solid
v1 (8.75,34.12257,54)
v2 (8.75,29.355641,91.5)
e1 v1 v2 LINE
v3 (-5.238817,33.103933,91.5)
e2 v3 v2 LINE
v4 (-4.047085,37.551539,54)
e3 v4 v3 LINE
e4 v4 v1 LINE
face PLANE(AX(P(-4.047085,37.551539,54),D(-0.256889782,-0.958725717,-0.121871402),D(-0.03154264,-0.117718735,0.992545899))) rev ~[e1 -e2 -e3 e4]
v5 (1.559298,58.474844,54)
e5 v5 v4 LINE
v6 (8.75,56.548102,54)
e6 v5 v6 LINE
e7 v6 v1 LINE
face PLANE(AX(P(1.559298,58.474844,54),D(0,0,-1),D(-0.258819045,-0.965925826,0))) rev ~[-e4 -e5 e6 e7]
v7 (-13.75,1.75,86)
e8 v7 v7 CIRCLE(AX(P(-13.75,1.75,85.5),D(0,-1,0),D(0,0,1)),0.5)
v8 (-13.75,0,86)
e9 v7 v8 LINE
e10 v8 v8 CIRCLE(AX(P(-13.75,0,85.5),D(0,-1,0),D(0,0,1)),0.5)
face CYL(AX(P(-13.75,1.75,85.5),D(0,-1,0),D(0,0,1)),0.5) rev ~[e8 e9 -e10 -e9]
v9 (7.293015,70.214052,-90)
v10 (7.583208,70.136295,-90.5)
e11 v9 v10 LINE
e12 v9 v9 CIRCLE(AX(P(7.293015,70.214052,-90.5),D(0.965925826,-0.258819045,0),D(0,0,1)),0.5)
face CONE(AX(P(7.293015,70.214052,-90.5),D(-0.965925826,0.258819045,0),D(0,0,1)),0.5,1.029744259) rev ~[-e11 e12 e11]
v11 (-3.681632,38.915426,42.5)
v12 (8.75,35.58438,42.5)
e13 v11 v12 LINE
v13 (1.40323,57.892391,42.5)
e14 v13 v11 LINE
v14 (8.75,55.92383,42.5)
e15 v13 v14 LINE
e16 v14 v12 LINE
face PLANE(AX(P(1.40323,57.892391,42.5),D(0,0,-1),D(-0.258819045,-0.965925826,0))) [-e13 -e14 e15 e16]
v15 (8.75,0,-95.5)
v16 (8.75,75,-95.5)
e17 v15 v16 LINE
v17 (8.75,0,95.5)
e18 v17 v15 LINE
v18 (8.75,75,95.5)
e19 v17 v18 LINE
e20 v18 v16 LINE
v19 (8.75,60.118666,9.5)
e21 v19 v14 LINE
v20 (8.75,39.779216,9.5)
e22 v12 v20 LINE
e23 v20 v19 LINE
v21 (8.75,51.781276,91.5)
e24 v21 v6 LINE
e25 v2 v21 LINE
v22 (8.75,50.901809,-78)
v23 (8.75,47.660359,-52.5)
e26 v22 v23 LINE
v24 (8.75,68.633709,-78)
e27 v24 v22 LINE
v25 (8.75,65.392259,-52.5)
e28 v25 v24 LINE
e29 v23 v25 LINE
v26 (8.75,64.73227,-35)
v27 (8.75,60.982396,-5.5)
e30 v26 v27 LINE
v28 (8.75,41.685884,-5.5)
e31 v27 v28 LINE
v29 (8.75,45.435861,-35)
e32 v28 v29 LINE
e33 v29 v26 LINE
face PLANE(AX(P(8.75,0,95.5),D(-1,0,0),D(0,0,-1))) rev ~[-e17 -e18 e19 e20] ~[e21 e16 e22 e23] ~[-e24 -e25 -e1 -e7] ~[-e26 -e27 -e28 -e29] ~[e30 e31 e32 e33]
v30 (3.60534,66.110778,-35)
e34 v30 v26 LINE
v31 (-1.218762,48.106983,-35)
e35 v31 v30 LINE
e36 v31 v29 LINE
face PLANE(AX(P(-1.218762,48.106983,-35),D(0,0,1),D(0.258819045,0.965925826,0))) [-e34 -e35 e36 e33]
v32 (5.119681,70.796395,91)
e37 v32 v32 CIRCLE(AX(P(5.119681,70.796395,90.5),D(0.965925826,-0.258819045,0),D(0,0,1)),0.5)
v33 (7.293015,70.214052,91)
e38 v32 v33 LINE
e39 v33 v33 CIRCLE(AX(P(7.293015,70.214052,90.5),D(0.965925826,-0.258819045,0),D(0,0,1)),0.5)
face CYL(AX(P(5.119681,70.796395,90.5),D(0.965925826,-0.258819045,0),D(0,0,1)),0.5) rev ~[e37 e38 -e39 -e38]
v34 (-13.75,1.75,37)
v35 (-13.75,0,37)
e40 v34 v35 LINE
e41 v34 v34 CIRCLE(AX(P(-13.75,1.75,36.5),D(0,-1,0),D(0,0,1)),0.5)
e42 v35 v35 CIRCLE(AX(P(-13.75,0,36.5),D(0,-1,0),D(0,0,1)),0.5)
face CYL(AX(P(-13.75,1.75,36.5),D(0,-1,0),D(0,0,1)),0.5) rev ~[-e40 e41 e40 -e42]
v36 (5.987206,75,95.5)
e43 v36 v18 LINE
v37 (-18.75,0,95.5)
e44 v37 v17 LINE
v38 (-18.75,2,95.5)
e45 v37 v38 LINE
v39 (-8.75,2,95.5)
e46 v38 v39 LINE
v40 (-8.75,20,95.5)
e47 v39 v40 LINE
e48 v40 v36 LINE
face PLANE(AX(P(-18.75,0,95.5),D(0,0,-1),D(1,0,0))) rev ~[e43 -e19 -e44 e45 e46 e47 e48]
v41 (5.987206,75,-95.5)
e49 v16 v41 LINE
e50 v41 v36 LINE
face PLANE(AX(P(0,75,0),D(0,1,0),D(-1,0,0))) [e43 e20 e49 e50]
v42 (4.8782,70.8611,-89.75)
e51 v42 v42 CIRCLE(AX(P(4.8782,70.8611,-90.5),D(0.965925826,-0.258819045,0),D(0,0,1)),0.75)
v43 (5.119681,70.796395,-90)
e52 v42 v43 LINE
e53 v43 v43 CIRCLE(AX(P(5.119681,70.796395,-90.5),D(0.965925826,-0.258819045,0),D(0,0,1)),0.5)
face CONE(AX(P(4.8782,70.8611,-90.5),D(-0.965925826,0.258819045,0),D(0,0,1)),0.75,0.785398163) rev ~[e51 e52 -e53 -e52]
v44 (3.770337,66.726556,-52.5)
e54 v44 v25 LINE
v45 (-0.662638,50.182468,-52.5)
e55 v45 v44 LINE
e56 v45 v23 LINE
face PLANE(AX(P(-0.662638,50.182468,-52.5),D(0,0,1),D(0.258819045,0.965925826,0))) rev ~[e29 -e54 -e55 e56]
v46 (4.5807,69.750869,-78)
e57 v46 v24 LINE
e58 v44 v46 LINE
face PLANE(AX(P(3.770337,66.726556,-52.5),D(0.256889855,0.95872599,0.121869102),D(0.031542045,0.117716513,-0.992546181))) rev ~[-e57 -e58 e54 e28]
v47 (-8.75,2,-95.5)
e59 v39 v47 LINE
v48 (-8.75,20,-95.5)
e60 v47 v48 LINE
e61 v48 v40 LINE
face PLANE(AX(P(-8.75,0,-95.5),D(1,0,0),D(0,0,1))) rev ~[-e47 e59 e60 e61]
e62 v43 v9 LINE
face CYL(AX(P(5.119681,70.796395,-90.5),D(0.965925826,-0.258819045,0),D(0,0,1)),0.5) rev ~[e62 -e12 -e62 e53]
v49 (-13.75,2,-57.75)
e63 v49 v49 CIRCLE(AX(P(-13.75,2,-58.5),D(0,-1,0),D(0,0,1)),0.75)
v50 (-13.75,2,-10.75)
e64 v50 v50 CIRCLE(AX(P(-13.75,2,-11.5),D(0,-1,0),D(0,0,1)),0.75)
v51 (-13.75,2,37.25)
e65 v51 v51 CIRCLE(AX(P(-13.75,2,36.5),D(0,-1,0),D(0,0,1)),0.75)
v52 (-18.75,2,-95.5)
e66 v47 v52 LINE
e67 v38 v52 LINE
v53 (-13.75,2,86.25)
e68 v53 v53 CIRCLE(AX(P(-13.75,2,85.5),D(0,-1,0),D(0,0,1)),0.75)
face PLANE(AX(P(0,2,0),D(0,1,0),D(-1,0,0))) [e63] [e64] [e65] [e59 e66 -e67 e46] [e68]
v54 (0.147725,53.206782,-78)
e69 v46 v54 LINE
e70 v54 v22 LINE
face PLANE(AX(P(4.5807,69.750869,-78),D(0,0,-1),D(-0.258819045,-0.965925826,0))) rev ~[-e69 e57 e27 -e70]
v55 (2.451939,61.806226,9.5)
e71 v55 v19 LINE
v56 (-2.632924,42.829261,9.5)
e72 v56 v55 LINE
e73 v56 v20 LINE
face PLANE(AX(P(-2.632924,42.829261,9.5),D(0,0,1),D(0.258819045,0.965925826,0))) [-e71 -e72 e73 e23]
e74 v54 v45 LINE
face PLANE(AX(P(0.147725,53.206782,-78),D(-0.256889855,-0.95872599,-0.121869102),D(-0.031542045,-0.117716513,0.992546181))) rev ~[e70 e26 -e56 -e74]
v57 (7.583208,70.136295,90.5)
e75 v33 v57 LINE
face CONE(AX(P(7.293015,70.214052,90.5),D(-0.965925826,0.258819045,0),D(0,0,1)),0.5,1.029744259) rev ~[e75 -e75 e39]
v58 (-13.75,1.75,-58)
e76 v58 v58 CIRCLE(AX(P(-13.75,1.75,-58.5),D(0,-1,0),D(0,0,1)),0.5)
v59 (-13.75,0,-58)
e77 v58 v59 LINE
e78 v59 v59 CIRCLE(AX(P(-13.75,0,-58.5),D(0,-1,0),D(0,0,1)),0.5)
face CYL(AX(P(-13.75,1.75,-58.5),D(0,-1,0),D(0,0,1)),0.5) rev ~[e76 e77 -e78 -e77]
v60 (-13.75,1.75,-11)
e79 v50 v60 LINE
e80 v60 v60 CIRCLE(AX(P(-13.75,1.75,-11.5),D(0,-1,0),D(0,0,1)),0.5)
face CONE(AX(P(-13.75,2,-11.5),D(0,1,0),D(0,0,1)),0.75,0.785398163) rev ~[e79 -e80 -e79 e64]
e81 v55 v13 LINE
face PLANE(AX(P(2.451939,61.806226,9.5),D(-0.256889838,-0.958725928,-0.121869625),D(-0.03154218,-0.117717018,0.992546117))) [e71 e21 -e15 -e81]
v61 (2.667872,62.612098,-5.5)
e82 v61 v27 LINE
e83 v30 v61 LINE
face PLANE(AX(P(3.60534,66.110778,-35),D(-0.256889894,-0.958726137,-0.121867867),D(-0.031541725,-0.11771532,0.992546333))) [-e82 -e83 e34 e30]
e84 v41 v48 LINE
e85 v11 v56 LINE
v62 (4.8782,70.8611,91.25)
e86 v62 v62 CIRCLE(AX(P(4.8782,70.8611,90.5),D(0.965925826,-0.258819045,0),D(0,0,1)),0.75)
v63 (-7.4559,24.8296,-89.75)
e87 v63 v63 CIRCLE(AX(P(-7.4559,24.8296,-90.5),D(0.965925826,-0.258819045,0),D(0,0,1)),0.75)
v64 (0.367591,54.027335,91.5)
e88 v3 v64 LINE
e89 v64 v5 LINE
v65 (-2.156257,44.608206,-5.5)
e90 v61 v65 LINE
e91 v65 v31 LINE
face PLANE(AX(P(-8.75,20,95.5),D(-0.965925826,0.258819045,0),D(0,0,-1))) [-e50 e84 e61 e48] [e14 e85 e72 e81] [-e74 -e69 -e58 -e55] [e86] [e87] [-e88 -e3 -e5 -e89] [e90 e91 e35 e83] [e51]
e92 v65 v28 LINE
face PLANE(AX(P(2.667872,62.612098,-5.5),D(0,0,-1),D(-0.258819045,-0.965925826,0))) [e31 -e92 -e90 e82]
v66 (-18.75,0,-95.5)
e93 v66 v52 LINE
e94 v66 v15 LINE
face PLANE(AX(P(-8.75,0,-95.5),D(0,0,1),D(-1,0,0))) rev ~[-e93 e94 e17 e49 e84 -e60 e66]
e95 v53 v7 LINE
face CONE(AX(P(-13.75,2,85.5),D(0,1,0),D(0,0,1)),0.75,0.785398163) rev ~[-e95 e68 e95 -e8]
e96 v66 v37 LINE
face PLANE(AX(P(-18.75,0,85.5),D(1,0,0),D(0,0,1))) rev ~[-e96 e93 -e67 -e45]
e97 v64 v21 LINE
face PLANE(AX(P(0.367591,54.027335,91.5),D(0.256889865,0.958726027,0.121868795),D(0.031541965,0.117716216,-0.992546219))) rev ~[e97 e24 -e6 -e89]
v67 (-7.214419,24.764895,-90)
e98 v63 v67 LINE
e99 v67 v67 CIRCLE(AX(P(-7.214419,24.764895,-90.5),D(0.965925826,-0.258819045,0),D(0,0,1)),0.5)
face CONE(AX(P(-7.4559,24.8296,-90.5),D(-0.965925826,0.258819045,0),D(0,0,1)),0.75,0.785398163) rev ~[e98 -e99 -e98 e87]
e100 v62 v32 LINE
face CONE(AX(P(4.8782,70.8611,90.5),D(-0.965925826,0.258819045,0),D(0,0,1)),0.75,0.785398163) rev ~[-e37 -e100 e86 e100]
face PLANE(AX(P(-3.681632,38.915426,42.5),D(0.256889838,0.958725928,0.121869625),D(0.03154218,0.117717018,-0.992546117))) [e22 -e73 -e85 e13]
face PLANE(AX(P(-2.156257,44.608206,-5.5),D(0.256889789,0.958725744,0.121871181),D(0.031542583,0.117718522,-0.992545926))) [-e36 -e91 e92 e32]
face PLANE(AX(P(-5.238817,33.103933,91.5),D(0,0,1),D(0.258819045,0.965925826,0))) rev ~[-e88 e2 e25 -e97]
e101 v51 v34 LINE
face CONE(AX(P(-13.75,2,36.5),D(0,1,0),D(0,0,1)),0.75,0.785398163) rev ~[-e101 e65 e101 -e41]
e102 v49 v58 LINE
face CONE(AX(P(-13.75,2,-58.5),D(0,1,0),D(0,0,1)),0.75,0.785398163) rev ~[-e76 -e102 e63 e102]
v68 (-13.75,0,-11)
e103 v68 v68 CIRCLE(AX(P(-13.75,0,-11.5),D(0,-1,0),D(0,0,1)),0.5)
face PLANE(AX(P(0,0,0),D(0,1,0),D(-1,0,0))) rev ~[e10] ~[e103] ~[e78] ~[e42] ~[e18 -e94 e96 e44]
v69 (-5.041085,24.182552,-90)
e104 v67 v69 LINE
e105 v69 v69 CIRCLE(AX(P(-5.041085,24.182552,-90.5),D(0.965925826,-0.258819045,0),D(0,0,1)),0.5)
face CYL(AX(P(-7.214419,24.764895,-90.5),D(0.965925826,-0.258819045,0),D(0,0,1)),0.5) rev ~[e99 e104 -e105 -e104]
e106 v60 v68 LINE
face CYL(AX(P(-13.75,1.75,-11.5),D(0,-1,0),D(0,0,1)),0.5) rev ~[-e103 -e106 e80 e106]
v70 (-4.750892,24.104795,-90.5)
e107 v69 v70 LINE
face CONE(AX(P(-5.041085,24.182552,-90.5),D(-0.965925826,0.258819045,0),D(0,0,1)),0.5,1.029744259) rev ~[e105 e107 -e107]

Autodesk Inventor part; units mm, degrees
ref_plane "YZ Plane" through (0, 0, 0) normal (1, 0, 0) x (0, 1, 0)
ref_plane "XZ Plane" through (0, 0, 0) normal (0, 1, 0) x (-1, 0, 0)
sketch "Эскиз1" plane through (0, 0, 0) normal (0, 1, 0) x (-1, 0, 0)
  line L0 (8.75, 95.5) -> (-8.75, 95.5)
  line L1 (-8.75, 95.5) -> (-8.75, -95.5)
  line L2 (-8.75, -95.5) -> (8.75, -95.5)
  line L3 (8.75, -95.5) -> (8.75, 95.5)
  line L4 (8.75, -95.5) -> (-8.75, 95.5) construction
  line L5 (-8.75, -95.5) -> (8.75, 95.5) construction
  point P0 (0, 0)
  point P1 (0, 0)
  dimension "d0" = 17.5
  dimension "d1" = 191
extrude "Выдавливание1" add sketch "Эскиз1" along normal blind 75
sketch "Эскиз2" plane through (-8.75, 0, -95.5) normal (-1, 0, 0) x (0, 0, 1)
  line L0 (191, 0) -> (191, 75) construction
  line L1 (191, 20) -> (0, 20)
  line L2 (0, 0) -> (0, 75) construction
  line L3 (0, 0) -> (191, 0) construction
  point P0 (95.5, 0)
  dimension "d4" = 20
ref_plane "РабПлоскость1" through (-8.75, 20, 95.5) normal (-0.9659258, 0.258819, 0) x (0, 0, -1)
split "Разделение1" plane through (-8.75, 20, 95.5) removes the side toward (-0.9659258, 0.258819, 0)
sketch "Эскиз3" plane through (5.9872, 75, -95.5) normal (-0.9659258, 0.258819, 0) x (0, 0, 1)
  line L0 (0, -56.9402) -> (0, 0) construction
  line L1 (0, 0) -> (191, 0) construction
  line L2 (191, 0) -> (191, -56.9402) construction
  line L3 (191, -56.9402) -> (0, -56.9402) construction
  line L4 (191, -71.7294) -> (191, 0.7151) construction
  line L5 (191, -53.9402) -> (0, -30.4883) construction
  line L6 (0, -71.7294) -> (0, 0.7151) construction
  line L7 (17.5, -22.562) -> (43, -25.693)
  line L8 (43, -25.693) -> (43, -8.5653)
  line L9 (43, -8.5653) -> (17.5, -5.4343)
  line L10 (17.5, -5.4343) -> (17.5, -22.562)
  line L11 (47, 0) -> (47, -56.9402) construction
  line L12 (191, -56.9402) -> (0, -56.9402) construction
  line L13 (94, 0) -> (94, -56.9402) construction
  line L14 (142, 0) -> (142, -56.9402) construction
  line L15 (43, -8.5653) -> (47, -8.5653) construction
  line L16 (60.5, -27.8417) -> (60.5, -9.2028)
  line L17 (60.5, -9.2028) -> (90, -12.8249)
  line L18 (90, -12.8249) -> (90, -31.4639)
  line L19 (90, -31.4639) -> (60.5, -27.8417)
  line L20 (90, -12.8249) -> (94, -12.8249) construction
  line L21 (105, -33.3056) -> (105, -13.6592)
  line L22 (105, -13.6592) -> (138, -17.7111)
  line L23 (138, -17.7111) -> (138, -37.3575)
  line L24 (138, -37.3575) -> (105, -33.3056)
  line L25 (138, -17.7111) -> (142, -17.7111) construction
  line L26 (149.5, -17.1081) -> (149.5, -38.7695)
  line L27 (149.5, -38.7695) -> (187, -43.374)
  line L28 (187, -43.374) -> (187, -21.7125)
  line L29 (187, -21.7125) -> (149.5, -17.1081)
  line L30 (187, -21.7125) -> (191, -21.7125) construction
  point P0 (95.5, -73.994)
  dimension "d6" = 3
  dimension "d7" = 7
  dimension "d8" = 10
  dimension "d9" = 25.5
  dimension "d10" = 27
  dimension "d11" = 4
  dimension "d12" = 29.5
  dimension "d13" = 28.5
  dimension "d14" = 33
  dimension "d15" = 29.5
  dimension "d16" = 37.5
  dimension "d17" = 31.5
  dimension "d36" = 49
  dimension "d37" = 48
  dimension "d38" = 47
extrude "Выдавливание2" cut sketch "Эскиз3" against normal through all
sketch "Эскиз5" plane through (0, 0, 0) normal (0, 1, 0) x (-1, 0, 0)
  line L0 (8.75, -95.5) -> (-8.75, -95.5) construction
  line L1 (-8.75, -95.5) -> (-8.75, 95.5) construction
  line L2 (-8.75, 95.5) -> (8.75, 95.5) construction
  line L3 (8.75, 95.5) -> (8.75, -95.5) projected
  line L4 (8.75, -95.5) -> (18.75, -95.5)
  line L5 (18.75, -95.5) -> (18.75, 85.5)
  line L6 (18.75, 95.5) -> (8.75, 95.5)
  line L7 (8.75, 95.5) -> (8.75, -95.5) construction
  line L8 (18.75, 85.5) -> (18.75, 95.5)
  line L9 (24.25, 0) -> (-14.25, 0) construction
  point P0 (0, 0)
  point P1 (8.75, 95.5)
  dimension "d26" = 10
extrude "Выдавливание5" add sketch "Эскиз5" along normal blind 2
sketch "Эскиз4" plane through (5.9872, 75, -95.5) normal (-0.9659258, 0.258819, 0) x (0, 0, 1)
  line L0 (191, 0.7151) -> (0, 0.7151) construction
  line L1 (95.5, 0.7151) -> (95.5, -56.9402) construction
  line L2 (191, -56.9402) -> (0, -56.9402) construction
  line L3 (191, -71.7294) -> (191, 0.7151) construction
  line L4 (0, -71.7294) -> (0, 0.7151) construction
  line L5 (191, -28.1126) -> (0, -28.1126) construction
  line L6 (191, -76.2587) -> (191, -56.9402) construction
  circle A0 centre (5, -51.9402) radius 0.5
  circle A1 centre (5, -4.2849) radius 0.5
  line L7 (0, -56.9402) -> (0, 0) projected
  line L8 (0, -56.9402) -> (10, -56.9402)
  line L9 (10, -56.9402) -> (10, -46.9402)
  line L10 (10, -46.9402) -> (0, -46.9402)
  line L11 (0, -46.9402) -> (0, -56.9402)
  line L12 (10, -56.9402) -> (0, -46.9402) construction
  line L13 (0, -56.9402) -> (10, -46.9402) construction
  circle A2 centre (186, -4.2849) radius 0.5
  point P0 (95.5, -73.994)
  point P1 (95.5, -28.1126)
  dimension "d46" = 10
  dimension "d47" = 1
hole "Отверстие1" at (-7.4559, 24.8296, -90.5) at (4.8782, 70.8611, -90.5) at (4.8782, 70.8611, 90.5) direction (0.9659258, -0.258819, 0) diameter 1 depth 2.5 tip angle 118 countersink diameter 1.5 countersink angle 90
sketch "Эскиз6" plane through (0, 2, 0) normal (0, 1, 0) x (1, 0, 0)
  line L0 (-8.75, -95.5) -> (-8.75, 95.5) construction
  line L1 (-18.75, 95.5) -> (-8.75, 95.5) construction
  line L2 (-18.75, -95.5) -> (-18.75, 95.5) construction
  line L3 (-8.75, -95.5) -> (-18.75, -95.5) construction
  line L4 (8.75, -95.5) -> (-8.75, -95.5) construction
  line L5 (8.75, 95.5) -> (8.75, -95.5) construction
  line L6 (-8.75, 95.5) -> (8.75, 95.5) construction
  line L7 (-8.75, -95.5) -> (-18.75, -95.5) construction
  line L8 (-18.75, -95.5) -> (-18.75, -85.5) construction
  line L9 (-18.75, -85.5) -> (-8.75, -85.5) construction
  line L10 (-8.75, -85.5) -> (-8.75, -95.5) construction
  circle A0 centre (-13.75, -85.5) radius 0.5
  circle A1 centre (-13.75, -36.5) radius 0.5
  circle A2 centre (-13.75, 11.5) radius 0.5
  circle A3 centre (-13.75, 58.5) radius 0.5
  point P0 (0, 0)
  dimension "d50" = 1
  dimension "d51" = 49
  dimension "d52" = 48
  dimension "d53" = 47
hole "Отверстие2" at (-13.75, 2, -58.5) at (-13.75, 2, -11.5) at (-13.75, 2, 36.5) at (-13.75, 2, 85.5) direction (0, -1, 0) diameter 1 end through all countersink diameter 1.5 countersink angle 90
properties part number "SortBoard-Frame"
